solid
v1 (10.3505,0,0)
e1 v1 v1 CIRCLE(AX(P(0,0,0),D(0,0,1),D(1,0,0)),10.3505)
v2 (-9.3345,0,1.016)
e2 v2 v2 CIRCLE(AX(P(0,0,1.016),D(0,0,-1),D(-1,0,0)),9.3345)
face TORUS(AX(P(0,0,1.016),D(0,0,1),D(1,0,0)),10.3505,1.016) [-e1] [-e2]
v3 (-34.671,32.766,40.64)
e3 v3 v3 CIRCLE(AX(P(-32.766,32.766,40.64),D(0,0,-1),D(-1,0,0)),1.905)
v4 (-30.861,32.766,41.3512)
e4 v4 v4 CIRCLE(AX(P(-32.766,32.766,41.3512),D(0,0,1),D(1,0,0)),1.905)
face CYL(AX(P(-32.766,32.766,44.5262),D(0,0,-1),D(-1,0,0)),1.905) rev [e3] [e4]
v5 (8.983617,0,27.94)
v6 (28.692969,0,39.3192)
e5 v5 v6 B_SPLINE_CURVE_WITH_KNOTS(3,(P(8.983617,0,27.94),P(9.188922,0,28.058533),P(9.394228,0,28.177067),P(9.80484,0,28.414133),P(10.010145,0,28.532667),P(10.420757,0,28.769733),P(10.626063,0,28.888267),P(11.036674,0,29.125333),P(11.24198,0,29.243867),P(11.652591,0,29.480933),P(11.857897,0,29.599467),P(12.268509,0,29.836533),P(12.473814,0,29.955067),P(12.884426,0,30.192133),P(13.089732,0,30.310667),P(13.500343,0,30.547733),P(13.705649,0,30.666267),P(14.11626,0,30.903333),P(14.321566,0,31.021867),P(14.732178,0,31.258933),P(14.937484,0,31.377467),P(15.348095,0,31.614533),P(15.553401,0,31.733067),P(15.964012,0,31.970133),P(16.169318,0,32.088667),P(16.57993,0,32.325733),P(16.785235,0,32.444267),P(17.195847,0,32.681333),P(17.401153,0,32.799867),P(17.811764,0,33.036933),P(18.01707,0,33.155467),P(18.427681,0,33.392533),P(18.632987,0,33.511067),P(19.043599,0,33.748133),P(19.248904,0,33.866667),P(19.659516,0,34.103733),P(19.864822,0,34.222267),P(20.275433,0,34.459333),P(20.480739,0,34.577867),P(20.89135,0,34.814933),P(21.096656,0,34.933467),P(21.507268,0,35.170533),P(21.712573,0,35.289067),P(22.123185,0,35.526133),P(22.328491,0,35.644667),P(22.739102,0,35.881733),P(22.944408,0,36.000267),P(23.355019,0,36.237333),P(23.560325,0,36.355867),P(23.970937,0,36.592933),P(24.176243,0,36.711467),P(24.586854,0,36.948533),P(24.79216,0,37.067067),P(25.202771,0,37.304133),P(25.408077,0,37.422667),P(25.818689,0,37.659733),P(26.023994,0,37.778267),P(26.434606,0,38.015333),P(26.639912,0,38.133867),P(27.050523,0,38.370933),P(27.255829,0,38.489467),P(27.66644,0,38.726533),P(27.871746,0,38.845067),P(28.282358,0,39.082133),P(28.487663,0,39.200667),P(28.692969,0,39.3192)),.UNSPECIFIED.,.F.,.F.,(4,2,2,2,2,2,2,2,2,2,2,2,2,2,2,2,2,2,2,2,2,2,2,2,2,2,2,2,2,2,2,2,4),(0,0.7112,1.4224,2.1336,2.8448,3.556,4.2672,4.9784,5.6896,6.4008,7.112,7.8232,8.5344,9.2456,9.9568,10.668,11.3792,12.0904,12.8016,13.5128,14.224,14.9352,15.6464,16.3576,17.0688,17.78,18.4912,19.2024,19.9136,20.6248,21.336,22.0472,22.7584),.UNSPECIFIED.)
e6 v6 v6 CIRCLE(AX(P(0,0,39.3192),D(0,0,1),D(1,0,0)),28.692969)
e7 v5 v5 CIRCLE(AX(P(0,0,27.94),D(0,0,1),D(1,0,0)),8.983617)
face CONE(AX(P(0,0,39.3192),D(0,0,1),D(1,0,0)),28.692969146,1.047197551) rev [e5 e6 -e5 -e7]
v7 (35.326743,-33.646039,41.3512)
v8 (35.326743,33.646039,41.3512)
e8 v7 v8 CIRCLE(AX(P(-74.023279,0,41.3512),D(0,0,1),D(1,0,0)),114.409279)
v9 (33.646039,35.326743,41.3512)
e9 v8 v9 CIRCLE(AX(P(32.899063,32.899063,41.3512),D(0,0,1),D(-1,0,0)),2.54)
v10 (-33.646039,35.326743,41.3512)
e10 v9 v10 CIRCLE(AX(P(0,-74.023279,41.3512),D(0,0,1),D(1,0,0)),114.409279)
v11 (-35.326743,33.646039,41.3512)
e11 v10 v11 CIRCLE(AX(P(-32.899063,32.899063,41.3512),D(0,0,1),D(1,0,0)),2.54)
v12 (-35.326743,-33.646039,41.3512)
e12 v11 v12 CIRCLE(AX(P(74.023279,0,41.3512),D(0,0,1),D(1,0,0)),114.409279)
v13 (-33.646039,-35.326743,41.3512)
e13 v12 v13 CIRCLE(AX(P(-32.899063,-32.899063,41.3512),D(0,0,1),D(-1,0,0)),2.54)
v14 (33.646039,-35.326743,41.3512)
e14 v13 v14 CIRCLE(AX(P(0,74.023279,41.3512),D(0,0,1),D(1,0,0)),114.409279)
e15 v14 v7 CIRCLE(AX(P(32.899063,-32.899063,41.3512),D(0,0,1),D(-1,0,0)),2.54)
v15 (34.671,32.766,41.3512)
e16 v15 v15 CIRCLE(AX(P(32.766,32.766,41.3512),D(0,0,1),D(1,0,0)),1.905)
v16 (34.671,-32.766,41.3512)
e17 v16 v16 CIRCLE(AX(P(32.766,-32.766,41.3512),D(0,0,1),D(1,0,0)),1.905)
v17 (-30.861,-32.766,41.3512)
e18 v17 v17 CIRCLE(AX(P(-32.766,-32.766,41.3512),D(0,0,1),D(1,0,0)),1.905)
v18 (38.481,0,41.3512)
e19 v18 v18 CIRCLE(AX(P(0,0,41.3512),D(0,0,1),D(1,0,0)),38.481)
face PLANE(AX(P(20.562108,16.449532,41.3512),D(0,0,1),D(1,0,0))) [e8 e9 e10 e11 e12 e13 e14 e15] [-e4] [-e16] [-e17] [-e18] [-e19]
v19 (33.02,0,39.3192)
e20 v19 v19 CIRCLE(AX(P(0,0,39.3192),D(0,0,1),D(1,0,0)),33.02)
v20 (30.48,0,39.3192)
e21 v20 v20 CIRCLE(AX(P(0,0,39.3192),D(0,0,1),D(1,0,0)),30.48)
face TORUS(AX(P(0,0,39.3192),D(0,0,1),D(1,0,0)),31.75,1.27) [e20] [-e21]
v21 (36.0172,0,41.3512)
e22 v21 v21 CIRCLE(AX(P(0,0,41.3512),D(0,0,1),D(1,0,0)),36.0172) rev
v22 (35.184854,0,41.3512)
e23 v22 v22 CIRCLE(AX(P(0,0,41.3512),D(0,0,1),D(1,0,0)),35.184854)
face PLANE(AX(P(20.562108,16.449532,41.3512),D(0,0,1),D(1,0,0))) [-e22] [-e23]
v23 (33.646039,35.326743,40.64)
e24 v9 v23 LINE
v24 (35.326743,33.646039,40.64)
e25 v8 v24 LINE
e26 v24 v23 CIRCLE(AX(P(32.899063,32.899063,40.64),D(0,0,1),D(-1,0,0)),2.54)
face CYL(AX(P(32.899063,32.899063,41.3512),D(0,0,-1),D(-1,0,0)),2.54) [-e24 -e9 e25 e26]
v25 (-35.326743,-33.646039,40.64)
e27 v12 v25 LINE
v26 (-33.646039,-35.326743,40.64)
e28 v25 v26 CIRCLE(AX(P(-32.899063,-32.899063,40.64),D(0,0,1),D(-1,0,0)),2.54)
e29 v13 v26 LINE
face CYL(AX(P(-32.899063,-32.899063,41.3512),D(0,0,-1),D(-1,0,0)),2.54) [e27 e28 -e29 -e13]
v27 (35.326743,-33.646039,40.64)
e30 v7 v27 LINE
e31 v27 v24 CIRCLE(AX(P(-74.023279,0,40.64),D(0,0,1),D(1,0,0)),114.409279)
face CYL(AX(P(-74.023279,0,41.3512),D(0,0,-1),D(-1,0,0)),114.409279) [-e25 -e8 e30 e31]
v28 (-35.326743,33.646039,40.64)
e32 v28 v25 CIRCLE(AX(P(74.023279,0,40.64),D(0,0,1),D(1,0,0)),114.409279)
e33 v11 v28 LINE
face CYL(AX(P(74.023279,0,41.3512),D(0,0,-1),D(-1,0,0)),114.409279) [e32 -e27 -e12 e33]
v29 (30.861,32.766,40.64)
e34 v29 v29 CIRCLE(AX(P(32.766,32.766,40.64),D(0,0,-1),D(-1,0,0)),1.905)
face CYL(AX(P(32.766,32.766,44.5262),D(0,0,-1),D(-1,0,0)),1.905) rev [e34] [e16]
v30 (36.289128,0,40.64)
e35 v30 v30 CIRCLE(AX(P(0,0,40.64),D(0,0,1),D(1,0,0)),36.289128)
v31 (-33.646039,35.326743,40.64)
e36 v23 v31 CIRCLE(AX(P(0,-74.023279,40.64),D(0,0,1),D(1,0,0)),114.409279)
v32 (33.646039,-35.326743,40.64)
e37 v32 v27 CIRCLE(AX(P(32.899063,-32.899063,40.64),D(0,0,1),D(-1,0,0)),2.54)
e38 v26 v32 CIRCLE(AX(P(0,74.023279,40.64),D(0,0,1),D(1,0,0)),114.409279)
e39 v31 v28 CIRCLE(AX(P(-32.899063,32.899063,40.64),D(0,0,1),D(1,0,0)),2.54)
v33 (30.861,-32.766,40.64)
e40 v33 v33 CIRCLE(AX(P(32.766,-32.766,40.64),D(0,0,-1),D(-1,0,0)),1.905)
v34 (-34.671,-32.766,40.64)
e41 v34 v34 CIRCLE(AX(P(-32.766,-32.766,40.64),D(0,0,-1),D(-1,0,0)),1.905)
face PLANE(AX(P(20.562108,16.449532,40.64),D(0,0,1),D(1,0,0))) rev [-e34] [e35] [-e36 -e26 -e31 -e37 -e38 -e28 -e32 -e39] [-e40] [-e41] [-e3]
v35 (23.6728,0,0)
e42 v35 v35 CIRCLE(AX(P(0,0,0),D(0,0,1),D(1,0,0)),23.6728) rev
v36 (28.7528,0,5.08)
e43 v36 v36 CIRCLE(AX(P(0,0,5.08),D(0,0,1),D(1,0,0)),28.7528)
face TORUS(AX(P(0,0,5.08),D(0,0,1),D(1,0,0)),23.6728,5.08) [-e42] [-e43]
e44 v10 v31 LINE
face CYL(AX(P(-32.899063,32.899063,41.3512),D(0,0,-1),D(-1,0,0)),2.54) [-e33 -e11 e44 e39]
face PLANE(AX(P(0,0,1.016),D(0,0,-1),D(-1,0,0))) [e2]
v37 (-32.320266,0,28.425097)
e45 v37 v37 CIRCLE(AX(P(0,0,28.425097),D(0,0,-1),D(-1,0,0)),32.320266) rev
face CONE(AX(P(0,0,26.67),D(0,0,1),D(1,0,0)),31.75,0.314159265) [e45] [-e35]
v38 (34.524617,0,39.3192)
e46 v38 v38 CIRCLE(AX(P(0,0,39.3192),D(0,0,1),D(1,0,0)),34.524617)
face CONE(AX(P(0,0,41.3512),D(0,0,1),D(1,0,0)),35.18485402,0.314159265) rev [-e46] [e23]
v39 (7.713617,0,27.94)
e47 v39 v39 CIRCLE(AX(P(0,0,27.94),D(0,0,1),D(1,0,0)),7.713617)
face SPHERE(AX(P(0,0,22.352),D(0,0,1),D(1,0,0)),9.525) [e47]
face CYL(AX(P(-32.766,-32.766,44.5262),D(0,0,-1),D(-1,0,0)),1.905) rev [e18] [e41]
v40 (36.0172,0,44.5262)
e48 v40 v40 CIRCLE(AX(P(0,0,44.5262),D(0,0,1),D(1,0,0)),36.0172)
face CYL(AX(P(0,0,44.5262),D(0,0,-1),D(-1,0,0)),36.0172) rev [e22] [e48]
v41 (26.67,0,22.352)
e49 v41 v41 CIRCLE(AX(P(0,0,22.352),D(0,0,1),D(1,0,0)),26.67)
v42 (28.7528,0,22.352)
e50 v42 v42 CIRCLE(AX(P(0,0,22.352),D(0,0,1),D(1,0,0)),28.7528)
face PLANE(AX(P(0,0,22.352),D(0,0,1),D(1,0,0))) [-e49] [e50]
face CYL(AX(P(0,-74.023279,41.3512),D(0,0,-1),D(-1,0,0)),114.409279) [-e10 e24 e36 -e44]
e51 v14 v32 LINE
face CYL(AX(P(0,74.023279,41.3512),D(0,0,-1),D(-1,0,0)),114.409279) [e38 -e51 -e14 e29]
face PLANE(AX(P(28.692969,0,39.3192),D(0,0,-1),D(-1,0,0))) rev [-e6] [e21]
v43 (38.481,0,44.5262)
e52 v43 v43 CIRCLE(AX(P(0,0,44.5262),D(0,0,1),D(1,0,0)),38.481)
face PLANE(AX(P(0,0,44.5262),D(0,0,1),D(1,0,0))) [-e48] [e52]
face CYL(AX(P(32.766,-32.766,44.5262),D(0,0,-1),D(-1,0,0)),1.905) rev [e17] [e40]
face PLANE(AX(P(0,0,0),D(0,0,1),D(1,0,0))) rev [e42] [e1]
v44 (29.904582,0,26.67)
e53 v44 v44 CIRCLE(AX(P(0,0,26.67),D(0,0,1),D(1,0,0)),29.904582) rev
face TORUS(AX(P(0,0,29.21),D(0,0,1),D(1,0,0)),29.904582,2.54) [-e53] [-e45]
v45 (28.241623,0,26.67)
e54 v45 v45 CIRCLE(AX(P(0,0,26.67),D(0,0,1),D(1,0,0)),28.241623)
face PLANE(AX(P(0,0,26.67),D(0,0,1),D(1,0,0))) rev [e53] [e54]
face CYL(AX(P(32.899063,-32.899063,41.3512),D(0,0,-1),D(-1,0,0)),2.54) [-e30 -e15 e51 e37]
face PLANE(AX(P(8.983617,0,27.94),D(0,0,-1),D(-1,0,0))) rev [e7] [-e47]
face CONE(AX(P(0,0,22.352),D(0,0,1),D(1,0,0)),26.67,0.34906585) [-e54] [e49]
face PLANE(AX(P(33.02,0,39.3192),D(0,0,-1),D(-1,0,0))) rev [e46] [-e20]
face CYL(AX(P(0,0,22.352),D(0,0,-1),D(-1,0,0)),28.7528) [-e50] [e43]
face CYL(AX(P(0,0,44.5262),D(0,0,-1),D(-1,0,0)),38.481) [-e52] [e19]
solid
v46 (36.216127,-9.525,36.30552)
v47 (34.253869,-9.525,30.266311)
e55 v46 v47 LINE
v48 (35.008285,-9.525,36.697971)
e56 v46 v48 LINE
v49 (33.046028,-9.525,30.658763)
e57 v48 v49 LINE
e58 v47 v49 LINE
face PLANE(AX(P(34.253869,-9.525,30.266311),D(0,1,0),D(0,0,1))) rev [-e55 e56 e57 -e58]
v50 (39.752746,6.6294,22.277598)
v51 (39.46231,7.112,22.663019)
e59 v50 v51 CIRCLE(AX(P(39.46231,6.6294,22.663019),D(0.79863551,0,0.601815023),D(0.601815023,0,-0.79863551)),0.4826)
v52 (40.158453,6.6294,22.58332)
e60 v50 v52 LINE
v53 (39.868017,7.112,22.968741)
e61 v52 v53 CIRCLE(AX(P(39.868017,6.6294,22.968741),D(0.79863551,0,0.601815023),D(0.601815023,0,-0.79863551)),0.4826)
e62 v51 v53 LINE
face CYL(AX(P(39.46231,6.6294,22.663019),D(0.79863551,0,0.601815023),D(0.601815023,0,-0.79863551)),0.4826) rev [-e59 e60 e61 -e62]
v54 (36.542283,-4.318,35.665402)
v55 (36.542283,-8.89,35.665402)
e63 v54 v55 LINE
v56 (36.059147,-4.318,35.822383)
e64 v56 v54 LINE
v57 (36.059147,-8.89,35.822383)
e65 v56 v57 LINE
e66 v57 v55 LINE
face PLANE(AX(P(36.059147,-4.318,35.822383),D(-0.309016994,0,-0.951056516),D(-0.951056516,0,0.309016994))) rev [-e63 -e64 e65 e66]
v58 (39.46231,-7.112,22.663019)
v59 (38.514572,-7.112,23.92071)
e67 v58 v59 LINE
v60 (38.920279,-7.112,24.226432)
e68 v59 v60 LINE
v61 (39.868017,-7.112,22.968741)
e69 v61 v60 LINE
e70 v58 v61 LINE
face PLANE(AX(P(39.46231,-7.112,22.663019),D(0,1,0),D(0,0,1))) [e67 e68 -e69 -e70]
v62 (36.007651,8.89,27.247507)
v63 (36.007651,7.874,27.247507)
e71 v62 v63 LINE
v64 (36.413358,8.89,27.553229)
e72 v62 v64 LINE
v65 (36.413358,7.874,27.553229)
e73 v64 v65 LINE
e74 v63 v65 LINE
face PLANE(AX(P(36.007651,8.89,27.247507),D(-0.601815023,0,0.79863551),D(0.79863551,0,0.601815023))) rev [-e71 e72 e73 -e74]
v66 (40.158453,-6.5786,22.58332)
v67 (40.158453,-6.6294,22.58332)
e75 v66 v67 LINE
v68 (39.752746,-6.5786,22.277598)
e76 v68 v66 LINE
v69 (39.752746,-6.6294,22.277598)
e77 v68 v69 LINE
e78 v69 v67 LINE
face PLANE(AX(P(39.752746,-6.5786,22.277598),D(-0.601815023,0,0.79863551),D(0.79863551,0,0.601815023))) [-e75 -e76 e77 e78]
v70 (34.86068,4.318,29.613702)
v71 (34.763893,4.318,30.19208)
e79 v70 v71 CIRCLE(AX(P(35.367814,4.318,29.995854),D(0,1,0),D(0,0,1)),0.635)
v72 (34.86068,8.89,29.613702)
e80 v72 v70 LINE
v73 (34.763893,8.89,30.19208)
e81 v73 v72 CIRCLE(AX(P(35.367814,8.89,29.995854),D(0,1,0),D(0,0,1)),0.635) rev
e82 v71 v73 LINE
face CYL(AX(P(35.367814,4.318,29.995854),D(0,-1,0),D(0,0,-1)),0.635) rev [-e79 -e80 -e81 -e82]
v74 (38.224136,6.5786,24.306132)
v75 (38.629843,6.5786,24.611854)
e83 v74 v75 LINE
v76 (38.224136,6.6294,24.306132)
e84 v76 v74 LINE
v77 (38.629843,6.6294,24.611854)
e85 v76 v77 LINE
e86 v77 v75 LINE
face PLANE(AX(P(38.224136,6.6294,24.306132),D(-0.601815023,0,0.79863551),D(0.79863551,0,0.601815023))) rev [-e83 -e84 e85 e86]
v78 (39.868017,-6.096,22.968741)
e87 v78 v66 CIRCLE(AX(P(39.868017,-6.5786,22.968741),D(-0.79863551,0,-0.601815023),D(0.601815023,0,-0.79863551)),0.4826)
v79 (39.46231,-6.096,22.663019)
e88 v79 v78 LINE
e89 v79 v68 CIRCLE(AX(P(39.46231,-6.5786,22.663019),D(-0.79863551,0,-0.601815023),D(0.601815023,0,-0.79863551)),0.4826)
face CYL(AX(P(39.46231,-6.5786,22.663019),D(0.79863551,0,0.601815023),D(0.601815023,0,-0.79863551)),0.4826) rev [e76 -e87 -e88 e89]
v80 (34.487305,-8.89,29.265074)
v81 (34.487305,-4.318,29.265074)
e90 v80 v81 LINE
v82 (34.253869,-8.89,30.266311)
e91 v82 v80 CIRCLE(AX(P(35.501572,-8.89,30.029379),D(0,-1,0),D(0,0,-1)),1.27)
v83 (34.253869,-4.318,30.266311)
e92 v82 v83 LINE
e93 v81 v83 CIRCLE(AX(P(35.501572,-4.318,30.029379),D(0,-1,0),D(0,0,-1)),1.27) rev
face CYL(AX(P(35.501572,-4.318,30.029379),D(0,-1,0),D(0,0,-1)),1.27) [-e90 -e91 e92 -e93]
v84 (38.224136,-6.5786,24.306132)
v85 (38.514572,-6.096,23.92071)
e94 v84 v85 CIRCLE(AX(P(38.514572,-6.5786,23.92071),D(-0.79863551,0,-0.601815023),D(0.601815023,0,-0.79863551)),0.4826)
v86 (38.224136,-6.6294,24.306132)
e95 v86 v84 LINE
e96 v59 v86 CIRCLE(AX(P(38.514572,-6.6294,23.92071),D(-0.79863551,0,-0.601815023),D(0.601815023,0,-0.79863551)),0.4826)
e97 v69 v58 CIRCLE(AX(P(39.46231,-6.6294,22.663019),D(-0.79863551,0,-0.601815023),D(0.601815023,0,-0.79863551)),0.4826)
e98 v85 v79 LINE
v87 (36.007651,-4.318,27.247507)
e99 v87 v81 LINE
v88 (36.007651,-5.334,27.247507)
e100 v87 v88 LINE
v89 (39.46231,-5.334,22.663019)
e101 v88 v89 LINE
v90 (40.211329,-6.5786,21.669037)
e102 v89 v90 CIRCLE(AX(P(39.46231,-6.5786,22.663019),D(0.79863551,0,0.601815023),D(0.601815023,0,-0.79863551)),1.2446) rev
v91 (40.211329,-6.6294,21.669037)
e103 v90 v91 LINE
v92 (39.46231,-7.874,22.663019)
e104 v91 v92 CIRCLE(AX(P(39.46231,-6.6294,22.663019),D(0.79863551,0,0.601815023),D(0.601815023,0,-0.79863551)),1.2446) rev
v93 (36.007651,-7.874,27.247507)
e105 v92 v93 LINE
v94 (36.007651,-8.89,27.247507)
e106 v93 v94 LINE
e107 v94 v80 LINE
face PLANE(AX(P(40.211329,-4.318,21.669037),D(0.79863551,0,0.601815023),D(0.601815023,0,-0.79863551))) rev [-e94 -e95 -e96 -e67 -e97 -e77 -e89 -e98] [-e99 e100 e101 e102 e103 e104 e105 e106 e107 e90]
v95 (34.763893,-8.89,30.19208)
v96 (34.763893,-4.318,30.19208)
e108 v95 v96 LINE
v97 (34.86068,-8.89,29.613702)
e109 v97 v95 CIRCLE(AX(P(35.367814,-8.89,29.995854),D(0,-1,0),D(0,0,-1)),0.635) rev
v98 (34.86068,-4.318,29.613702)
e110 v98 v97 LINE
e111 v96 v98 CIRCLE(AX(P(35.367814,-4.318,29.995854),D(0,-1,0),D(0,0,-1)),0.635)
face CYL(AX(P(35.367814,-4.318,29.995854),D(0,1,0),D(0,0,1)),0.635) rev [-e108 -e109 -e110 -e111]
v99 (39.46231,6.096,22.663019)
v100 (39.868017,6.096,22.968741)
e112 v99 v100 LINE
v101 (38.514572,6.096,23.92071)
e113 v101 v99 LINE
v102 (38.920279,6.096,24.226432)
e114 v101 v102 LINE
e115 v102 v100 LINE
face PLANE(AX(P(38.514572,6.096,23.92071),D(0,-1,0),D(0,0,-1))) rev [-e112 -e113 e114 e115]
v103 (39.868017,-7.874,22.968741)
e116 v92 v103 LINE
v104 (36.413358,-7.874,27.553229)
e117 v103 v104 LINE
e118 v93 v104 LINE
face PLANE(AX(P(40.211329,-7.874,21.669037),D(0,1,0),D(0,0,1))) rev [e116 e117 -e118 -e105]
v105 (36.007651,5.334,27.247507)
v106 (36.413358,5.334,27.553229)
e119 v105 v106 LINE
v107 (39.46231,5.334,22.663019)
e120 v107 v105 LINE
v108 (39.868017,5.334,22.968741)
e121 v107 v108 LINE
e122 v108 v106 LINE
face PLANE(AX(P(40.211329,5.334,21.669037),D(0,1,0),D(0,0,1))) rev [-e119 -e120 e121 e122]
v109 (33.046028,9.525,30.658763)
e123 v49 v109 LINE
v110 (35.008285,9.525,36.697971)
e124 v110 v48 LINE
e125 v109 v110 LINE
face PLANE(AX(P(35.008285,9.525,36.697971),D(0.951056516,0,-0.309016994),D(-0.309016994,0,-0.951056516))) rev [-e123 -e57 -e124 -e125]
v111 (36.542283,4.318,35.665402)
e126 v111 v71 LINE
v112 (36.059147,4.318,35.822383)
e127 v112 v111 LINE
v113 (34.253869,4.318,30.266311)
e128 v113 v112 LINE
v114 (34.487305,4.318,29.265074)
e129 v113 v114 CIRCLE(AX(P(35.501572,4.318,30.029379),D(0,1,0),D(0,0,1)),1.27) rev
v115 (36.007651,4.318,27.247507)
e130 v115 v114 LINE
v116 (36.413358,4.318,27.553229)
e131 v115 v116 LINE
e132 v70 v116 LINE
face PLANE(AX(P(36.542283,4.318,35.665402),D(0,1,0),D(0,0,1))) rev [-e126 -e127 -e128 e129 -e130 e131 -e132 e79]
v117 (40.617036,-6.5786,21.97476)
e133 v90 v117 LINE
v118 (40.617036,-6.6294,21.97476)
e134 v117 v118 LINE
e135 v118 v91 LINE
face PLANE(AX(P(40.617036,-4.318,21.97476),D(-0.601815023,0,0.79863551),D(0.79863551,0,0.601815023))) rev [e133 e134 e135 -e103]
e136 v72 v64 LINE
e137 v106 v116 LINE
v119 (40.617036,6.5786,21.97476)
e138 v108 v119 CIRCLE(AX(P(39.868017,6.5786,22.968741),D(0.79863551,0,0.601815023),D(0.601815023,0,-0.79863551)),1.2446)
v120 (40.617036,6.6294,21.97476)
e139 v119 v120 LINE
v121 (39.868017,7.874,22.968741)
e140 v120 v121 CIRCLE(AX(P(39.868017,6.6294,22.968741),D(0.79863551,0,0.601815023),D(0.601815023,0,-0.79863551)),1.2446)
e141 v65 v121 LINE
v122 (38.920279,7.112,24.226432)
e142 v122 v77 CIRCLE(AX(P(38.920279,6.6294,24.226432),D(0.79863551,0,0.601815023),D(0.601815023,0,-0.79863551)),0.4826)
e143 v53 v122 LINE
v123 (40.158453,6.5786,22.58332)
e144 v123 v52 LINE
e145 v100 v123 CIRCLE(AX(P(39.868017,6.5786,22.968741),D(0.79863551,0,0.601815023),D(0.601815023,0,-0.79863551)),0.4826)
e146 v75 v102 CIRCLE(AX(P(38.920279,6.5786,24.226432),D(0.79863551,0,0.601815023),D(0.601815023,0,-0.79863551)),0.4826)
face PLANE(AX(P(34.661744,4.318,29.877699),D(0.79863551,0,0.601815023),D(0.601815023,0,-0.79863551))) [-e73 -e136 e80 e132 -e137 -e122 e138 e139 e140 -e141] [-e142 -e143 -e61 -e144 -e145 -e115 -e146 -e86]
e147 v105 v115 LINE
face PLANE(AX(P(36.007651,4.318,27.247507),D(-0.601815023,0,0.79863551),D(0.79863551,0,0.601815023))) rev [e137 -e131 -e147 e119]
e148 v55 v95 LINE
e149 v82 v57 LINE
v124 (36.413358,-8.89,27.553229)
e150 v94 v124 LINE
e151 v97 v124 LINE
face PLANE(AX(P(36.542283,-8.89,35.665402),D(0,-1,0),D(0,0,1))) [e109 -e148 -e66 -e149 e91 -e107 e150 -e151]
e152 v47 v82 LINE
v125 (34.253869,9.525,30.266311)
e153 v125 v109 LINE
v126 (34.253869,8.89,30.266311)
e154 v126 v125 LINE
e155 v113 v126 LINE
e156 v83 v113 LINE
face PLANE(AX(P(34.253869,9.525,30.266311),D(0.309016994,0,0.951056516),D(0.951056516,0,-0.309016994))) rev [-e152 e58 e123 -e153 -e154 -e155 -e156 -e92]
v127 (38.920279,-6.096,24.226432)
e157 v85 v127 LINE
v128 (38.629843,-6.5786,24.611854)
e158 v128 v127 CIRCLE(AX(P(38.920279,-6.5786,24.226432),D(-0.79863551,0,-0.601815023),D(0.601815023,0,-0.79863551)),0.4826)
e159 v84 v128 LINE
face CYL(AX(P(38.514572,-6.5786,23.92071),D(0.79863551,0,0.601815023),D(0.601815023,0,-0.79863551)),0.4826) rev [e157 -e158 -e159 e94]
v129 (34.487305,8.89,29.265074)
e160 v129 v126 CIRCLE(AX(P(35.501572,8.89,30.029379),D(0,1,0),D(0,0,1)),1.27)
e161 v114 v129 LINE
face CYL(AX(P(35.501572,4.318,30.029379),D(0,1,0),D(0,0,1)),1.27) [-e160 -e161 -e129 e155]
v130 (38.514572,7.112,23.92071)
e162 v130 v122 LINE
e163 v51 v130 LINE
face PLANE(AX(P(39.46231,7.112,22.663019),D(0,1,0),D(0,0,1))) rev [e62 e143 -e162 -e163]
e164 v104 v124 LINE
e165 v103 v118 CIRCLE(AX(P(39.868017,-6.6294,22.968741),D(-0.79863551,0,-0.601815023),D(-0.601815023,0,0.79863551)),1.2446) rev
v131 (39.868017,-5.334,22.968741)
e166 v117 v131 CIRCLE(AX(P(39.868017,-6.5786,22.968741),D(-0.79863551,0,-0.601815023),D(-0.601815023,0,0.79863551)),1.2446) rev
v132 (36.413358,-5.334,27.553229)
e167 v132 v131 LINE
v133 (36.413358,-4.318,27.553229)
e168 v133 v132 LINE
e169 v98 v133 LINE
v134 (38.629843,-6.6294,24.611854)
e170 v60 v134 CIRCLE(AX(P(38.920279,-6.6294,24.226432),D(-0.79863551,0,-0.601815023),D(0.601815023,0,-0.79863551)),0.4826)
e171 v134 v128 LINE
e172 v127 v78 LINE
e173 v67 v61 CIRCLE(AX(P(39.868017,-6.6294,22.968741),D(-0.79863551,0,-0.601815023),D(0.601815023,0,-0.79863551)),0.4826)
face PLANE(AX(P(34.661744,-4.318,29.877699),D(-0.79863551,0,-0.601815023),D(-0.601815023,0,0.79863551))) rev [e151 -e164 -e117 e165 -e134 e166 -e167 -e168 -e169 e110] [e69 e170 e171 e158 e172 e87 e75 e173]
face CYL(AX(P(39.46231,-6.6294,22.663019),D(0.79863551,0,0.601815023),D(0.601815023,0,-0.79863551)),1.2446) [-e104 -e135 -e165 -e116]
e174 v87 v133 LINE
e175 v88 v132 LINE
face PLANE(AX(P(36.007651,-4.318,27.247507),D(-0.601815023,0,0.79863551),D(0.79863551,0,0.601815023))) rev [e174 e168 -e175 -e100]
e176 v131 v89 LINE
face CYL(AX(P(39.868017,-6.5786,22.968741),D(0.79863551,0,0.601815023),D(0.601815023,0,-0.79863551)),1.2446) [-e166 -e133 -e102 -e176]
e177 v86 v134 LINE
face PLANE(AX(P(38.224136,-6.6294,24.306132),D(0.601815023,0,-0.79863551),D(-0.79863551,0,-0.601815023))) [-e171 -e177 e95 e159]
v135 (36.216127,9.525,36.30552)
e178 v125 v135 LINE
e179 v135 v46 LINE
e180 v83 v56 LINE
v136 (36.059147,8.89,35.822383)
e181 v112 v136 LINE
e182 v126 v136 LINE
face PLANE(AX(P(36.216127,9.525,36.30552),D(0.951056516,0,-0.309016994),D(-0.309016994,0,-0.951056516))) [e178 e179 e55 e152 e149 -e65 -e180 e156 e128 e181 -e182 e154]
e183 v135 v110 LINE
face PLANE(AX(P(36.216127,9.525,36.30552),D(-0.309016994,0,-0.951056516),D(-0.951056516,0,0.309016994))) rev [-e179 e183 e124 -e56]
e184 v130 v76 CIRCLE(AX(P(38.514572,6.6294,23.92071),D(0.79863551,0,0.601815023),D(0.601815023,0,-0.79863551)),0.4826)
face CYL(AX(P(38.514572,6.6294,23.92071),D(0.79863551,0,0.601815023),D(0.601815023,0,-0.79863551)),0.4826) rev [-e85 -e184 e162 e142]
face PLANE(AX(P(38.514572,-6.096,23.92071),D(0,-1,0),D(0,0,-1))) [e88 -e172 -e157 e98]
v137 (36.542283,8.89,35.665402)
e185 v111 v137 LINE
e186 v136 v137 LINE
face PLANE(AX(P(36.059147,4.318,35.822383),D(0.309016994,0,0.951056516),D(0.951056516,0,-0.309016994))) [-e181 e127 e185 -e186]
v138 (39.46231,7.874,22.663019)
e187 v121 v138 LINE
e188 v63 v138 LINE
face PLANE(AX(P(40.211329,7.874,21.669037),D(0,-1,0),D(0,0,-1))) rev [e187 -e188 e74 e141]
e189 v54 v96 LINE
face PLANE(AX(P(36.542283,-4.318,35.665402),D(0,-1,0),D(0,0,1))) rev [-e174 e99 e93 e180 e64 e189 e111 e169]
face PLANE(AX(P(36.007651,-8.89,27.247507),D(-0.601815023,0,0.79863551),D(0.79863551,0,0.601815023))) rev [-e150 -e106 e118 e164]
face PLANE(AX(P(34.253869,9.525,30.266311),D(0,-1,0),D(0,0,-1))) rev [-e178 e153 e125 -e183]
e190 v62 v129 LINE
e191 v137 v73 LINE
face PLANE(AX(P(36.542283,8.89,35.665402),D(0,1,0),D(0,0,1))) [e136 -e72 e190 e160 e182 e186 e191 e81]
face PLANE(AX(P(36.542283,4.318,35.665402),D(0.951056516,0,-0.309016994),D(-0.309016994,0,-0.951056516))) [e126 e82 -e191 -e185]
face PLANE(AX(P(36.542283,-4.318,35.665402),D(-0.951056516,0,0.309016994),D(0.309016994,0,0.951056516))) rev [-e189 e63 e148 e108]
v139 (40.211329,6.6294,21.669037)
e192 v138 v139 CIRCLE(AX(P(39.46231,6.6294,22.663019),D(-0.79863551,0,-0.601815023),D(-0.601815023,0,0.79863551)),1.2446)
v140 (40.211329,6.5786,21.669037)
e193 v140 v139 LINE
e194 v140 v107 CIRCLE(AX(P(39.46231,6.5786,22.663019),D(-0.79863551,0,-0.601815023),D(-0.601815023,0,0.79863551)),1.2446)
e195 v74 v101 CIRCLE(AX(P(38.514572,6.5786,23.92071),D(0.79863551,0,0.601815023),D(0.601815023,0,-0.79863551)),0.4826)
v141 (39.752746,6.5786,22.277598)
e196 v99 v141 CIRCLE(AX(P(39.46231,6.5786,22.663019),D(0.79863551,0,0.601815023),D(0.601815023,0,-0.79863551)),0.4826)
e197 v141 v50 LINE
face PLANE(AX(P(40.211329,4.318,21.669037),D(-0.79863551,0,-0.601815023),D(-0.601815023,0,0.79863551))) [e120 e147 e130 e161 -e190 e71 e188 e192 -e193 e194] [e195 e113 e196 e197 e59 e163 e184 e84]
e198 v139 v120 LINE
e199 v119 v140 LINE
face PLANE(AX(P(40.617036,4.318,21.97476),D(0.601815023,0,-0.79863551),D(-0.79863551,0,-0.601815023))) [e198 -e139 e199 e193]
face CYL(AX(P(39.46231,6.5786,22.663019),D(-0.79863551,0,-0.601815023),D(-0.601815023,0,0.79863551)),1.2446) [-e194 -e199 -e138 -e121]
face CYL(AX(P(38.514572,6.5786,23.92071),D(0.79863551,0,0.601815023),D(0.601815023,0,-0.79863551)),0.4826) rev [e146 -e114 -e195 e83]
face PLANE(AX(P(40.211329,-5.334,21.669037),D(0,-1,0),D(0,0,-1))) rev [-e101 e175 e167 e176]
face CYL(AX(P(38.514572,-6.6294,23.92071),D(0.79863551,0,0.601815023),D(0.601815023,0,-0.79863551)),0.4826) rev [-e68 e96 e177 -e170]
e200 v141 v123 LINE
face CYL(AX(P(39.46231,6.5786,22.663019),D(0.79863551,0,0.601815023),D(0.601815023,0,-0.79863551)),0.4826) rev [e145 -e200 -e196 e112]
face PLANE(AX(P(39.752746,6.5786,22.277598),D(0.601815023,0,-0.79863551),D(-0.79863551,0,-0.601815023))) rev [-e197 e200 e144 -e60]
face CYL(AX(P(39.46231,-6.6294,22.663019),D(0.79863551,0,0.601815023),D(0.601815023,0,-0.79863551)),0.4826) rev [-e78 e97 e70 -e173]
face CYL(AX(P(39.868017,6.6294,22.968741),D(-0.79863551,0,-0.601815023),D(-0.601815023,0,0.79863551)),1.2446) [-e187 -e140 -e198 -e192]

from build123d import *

# Parameters (mm, degrees)
SKETCH3_R          = 28.7528
EXTRUDE1_DEPTH     = 22.352
FILLET1_R          = 5.08
SKETCH4_R          = 26.67
EXTRUDE2_DEPTH     = 4.318
EXTRUDE2_DRAFT     = -20
SKETCH5_R          = 31.75
EXTRUDE3_DEPTH     = 13.97
EXTRUDE3_DRAFT     = -18
EXTRUDE4_DEPTH     = 0.7112
SKETCH8_R          = 38.481
SKETCH8_R_2        = 36.0172
EXTRUDE5_DEPTH     = 3.175
SKETCH9_R          = 9.3345
CUT_EXTRUDE1_DEPTH = 1.016
FILLET2_R          = 1.016
SKETCH10_R         = 1.905
CUT_EXTRUDE2_DEPTH = 71.097557675
FILLET3_R          = 2.54
SKETCH12_W         = 19.05
SKETCH12_H         = 6.35
EXTRUDE6_DEPTH     = 1.27
EXTRUDE7_DEPTH     = 4.572
SKETCH14_W         = 6.985
SKETCH14_H         = 1.016
CUT_EXTRUDE3_DEPTH = 0.508
FILLET4_R          = 1.2446
CUT_EXTRUDE4_DEPTH = 0.508
FILLET5_R          = 1.27
FILLET6_R          = 0.635


# Some blends are built 0.0001 mm under size
with BuildPart() as part:
    # Sketch3 → Extrude1 (new body)
    with BuildSketch(Plane.XY):
        Circle(SKETCH3_R)
    extrude(amount=EXTRUDE1_DEPTH)

    # Fillet1
    fillet1_edges = [part.edges().sort_by_distance(p)[0] for p in [
        (-28.7528, 0, 0),
    ]]
    fillet(fillet1_edges, radius=FILLET1_R)


with BuildPart() as extrude2_tool:
    # Sketch4 → Extrude2 (with draft: the straight prism first)
    with BuildSketch(Plane.XY.offset(22.352)):
        Circle(SKETCH4_R)
    extrude(amount=EXTRUDE2_DEPTH)
    # Extrude2: the draft: its side faces are tilted about the plane it starts from
    extrude2_sides = [extrude2_tool.faces().sort_by_distance(p)[0] for p in [
        (-26.67, 0, 24.511),
    ]]
    draft(extrude2_sides, Plane.XY.offset(22.352), EXTRUDE2_DRAFT)


with BuildPart() as part_1:
    add(part.part)

    # Extrude2: add extrude2_tool
    add(extrude2_tool.part)


with BuildPart() as extrude3_tool:
    # Sketch5 → Extrude3 (with draft: the straight prism first)
    with BuildSketch(Plane.XY.offset(26.67)):
        Circle(SKETCH5_R)
    extrude(amount=EXTRUDE3_DEPTH)
    # Extrude3: the draft: its side faces are tilted about the plane it starts from
    extrude3_sides = [extrude3_tool.faces().sort_by_distance(p)[0] for p in [
        (-31.75, 0, 33.655),
    ]]
    draft(extrude3_sides, Plane.XY.offset(26.67), EXTRUDE3_DRAFT)


with BuildPart() as part_2:
    add(part_1.part)

    # Extrude3: add extrude3_tool
    add(extrude3_tool.part)

    # Sketch7 → Extrude4 (add)
    with BuildSketch(Plane.XY.offset(40.64)):
        with BuildLine():
            ThreePointArc((33.646038655, 35.326742513), (0, 40.386), (-33.646038655, 35.326742513))
            ThreePointArc((-33.646038655, 35.326742513), (-34.695114294, 34.695114294), (-35.326742513, 33.646038655))
            ThreePointArc((-35.326742513, 33.646038655), (-40.386, 0), (-35.326742513, -33.646038655))
            ThreePointArc((-35.326742513, -33.646038655), (-34.695114294, -34.695114294), (-33.646038655, -35.326742513))
            ThreePointArc((-33.646038655, -35.326742513), (0, -40.386), (33.646038655, -35.326742513))
            ThreePointArc((33.646038655, -35.326742513), (34.695114294, -34.695114294), (35.326742513, -33.646038655))
            ThreePointArc((35.326742513, -33.646038655), (40.386, 0), (35.326742513, 33.646038655))
            ThreePointArc((35.326742513, 33.646038655), (34.695114294, 34.695114294), (33.646038655, 35.326742513))
        make_face()
    extrude(amount=EXTRUDE4_DEPTH)

    # Sketch8 → Extrude5 (add)
    with BuildSketch(Plane.XY.offset(41.3512)):
        Circle(SKETCH8_R)
        Circle(SKETCH8_R_2, mode=Mode.SUBTRACT)
    extrude(amount=EXTRUDE5_DEPTH)

    # Sketch9 → Cut-Extrude1 (cut)
    with BuildSketch(Plane(origin=(0, 0, 0), x_dir=(-1, 0, 0), z_dir=(0, 0, -1))):
        Circle(SKETCH9_R)
    extrude(amount=-CUT_EXTRUDE1_DEPTH, mode=Mode.SUBTRACT)

    # Fillet2
    fillet2_edges = [part_2.edges().sort_by_distance(p)[0] for p in [
        (9.3345, 0, 0),
    ]]
    fillet(fillet2_edges, radius=FILLET2_R - 0.0001)  # a hair under: the kernel refuses the full size

    # Sketch10 → Cut-Extrude2 (cut, through all)
    with BuildSketch(Plane(origin=(0, 0, 40.64), x_dir=(-1, 0, 0), z_dir=(0, 0, -1))):
        with Locations((-32.766, 32.766)):
            Circle(SKETCH10_R)
        with Locations((32.766, 32.766)):
            Circle(SKETCH10_R)
        with Locations((32.766, -32.766)):
            Circle(SKETCH10_R)
        with Locations((-32.766, -32.766)):
            Circle(SKETCH10_R)
    extrude(amount=-CUT_EXTRUDE2_DEPTH, mode=Mode.SUBTRACT)

    # Fillet3
    fillet3_edges = [part_2.edges().sort_by_distance(p)[0] for p in [
        (-31.75, 0, 26.67),
    ]]
    fillet(fillet3_edges, radius=FILLET3_R)

    # Sketch11 → Cut-Revolve1 (revolve, cut)
    with BuildSketch(Plane(origin=(0, 0, 0), x_dir=(1, 0, 0), z_dir=(0, 1, 0))):
        with BuildLine():
            Line((0, -41.3512), (35.18485402, -41.3512))
            Line((35.18485402, -41.3512), (34.524617197, -39.3192))
            Line((34.524617197, -39.3192), (33.02, -39.3192))
            ThreePointArc((33.02, -39.3192), (31.75, -40.5892), (30.48, -39.3192))
            Line((30.48, -39.3192), (28.692969146, -39.3192))
            Line((28.692969146, -39.3192), (8.983616597, -27.94))
            Line((8.983616597, -27.94), (7.713616597, -27.94))
            ThreePointArc((7.713616597, -27.94), (4.330122689, -30.835847152), (0, -31.877))
            Line((0, -31.877), (0, -41.3512))
        make_face()
    revolve(axis=Axis((0, 0, 54.369202761), (0, 0, -1)), mode=Mode.SUBTRACT)


with BuildPart() as body_2:
    # Sketch12 → Extrude6 (new body)
    with BuildSketch(Plane(origin=(34.304696843, 0, 34.532548417), x_dir=(0, -1, 0), z_dir=(0.9510565162951533, 0, -0.30901699437494806))):
        with Locations((0, 0.898139508)):
            Rectangle(SKETCH12_W, SKETCH12_H)
    extrude(amount=EXTRUDE6_DEPTH)

    # Sketch13 → Extrude7 (add)
    with BuildSketch(Plane(origin=(0, 8.89, 0), x_dir=(-1, 0, 0), z_dir=(0, 1, 0))):
        Polygon((-34.096888657, 29.783174253), (-36.059146572, 35.822383132), (-36.542283282, 35.665402499), (-34.661744313, 29.877698672), (-40.617036132, 21.974759503), (-40.211329293, 21.669037471), align=None)
    extrude7 = extrude(amount=-EXTRUDE7_DEPTH)

    # Mirror1: Extrude7 across plane
    add(extrude7.mirror(Plane.ZX))

    # Sketch14 → Cut-Extrude3 (cut)
    with BuildSketch(Plane(origin=(36.46805158, 0, 27.480647967), x_dir=(0.6018150231520509, 0, -0.7986355100472909), z_dir=(0.7986355100472908, 0, 0.6018150231520508))):
        with Locations((3.401619276, 8.382)):
            Rectangle(SKETCH14_W, SKETCH14_H)
        with Locations((3.401619276, 4.826)):
            Rectangle(SKETCH14_W, SKETCH14_H)
        with Locations((3.401619276, -4.826)):
            Rectangle(SKETCH14_W, SKETCH14_H)
        with Locations((3.401619276, -8.382)):
            Rectangle(SKETCH14_W, SKETCH14_H)
    extrude(amount=-CUT_EXTRUDE3_DEPTH, mode=Mode.SUBTRACT)

    # Fillet4
    fillet4_edges = [body_2.edges().sort_by_distance(p)[0] for p in [
        (40.414182712, 7.874, 21.821898487),
        (40.414182712, 5.334, 21.821898487),
        (40.414182712, -5.334, 21.821898487),
        (40.414182712, -7.874, 21.821898487),
    ]]
    fillet(fillet4_edges, radius=FILLET4_R)

    # Sketch15 → Cut-Extrude4 (cut)
    with BuildSketch(Plane(origin=(36.46805158, 0, 27.480647967), x_dir=(0.6018150231520509, 0, -0.7986355100472909), z_dir=(0.7986355100472908, 0, 0.6018150231520508))):
        with BuildLine():
            Line((6.132119276, 6.5786), (6.132119276, 6.6294))
            ThreePointArc((6.132119276, 6.6294), (5.990769009, 6.970649733), (5.649519276, 7.112))
            Line((5.649519276, 7.112), (4.074719276, 7.112))
            ThreePointArc((4.074719276, 7.112), (3.733469544, 6.970649733), (3.592119276, 6.6294))
            Line((3.592119276, 6.6294), (3.592119276, 6.5786))
            ThreePointArc((3.592119276, 6.5786), (3.733469544, 6.237350267), (4.074719276, 6.096))
            Line((4.074719276, 6.096), (5.649519276, 6.096))
            ThreePointArc((5.649519276, 6.096), (5.990769009, 6.237350267), (6.132119276, 6.5786))
        make_face()
    cut_extrude4 = extrude(amount=-CUT_EXTRUDE4_DEPTH, mode=Mode.SUBTRACT)

    # Mirror2: Cut-Extrude4 across plane
    add(cut_extrude4.mirror(Plane.ZX), mode=Mode.SUBTRACT)

    # Fillet5
    # the kernel refuses this fillet: 1.27 mm, written as the material it takes off along each edge
    with BuildSketch(Plane(origin=(34.096888657, 10.511830148, 29.783174253), x_dir=(0.6018150231520495, 0, -0.7986355100472919), z_dir=(0, -1, 0))) as fillet5_piece_1:
        with BuildLine():
            CenterArc((0.648732059, 1.27), FILLET5_R, 222.247861742, 47.752138258)
            Line((-0.29137683, 0.416129238), (-0.310179007, 0.399051823))
            ThreePointArc((-0.310179007, 0.399051823), (-0.166494877, 0.193495778), (-0.020806462, -0.014568841))
            Line((-0.020806462, -0.014568841), (0, -0.0254))
            Line((0, -0.0254), (0.648732059, -0.0254))
            Line((0.648732059, -0.0254), (0.648732059, 0))
        make_face()
    extrude(amount=7.815660295, mode=Mode.SUBTRACT)
    with BuildSketch(Plane(origin=(34.096888657, -10.511830148, 29.783174253), x_dir=(0.30901699437495045, 0, 0.9510565162951525), z_dir=(0, 1, 0))) as fillet5_piece_2:
        with BuildLine():
            CenterArc((0.668225674, 1.259852267), FILLET5_R, 215, 47.752138258)
            Line((-0.372097423, 0.531410192), (-0.392903885, 0.516841351))
            Line((-0.392903885, 0.516841351), (-0.020806462, -0.014568841))
            Line((-0.020806462, -0.014568841), (0, -0.0254))
            ThreePointArc((0, -0.0254), (0.254, -0.0254), (0.504795487, -0.025197045))
            Line((0.504795487, -0.025197045), (0.508, 0))
        make_face()
    extrude(amount=7.815660295, mode=Mode.SUBTRACT)

    # Fillet6
    fillet6_edges = [body_2.edges().sort_by_distance(p)[0] for p in [
        (34.661744313, 6.604, 29.877698672),
        (34.661744313, -6.604, 29.877698672),
    ]]
    fillet(fillet6_edges, radius=FILLET6_R)


solid = Compound([part_2.part, body_2.part])
